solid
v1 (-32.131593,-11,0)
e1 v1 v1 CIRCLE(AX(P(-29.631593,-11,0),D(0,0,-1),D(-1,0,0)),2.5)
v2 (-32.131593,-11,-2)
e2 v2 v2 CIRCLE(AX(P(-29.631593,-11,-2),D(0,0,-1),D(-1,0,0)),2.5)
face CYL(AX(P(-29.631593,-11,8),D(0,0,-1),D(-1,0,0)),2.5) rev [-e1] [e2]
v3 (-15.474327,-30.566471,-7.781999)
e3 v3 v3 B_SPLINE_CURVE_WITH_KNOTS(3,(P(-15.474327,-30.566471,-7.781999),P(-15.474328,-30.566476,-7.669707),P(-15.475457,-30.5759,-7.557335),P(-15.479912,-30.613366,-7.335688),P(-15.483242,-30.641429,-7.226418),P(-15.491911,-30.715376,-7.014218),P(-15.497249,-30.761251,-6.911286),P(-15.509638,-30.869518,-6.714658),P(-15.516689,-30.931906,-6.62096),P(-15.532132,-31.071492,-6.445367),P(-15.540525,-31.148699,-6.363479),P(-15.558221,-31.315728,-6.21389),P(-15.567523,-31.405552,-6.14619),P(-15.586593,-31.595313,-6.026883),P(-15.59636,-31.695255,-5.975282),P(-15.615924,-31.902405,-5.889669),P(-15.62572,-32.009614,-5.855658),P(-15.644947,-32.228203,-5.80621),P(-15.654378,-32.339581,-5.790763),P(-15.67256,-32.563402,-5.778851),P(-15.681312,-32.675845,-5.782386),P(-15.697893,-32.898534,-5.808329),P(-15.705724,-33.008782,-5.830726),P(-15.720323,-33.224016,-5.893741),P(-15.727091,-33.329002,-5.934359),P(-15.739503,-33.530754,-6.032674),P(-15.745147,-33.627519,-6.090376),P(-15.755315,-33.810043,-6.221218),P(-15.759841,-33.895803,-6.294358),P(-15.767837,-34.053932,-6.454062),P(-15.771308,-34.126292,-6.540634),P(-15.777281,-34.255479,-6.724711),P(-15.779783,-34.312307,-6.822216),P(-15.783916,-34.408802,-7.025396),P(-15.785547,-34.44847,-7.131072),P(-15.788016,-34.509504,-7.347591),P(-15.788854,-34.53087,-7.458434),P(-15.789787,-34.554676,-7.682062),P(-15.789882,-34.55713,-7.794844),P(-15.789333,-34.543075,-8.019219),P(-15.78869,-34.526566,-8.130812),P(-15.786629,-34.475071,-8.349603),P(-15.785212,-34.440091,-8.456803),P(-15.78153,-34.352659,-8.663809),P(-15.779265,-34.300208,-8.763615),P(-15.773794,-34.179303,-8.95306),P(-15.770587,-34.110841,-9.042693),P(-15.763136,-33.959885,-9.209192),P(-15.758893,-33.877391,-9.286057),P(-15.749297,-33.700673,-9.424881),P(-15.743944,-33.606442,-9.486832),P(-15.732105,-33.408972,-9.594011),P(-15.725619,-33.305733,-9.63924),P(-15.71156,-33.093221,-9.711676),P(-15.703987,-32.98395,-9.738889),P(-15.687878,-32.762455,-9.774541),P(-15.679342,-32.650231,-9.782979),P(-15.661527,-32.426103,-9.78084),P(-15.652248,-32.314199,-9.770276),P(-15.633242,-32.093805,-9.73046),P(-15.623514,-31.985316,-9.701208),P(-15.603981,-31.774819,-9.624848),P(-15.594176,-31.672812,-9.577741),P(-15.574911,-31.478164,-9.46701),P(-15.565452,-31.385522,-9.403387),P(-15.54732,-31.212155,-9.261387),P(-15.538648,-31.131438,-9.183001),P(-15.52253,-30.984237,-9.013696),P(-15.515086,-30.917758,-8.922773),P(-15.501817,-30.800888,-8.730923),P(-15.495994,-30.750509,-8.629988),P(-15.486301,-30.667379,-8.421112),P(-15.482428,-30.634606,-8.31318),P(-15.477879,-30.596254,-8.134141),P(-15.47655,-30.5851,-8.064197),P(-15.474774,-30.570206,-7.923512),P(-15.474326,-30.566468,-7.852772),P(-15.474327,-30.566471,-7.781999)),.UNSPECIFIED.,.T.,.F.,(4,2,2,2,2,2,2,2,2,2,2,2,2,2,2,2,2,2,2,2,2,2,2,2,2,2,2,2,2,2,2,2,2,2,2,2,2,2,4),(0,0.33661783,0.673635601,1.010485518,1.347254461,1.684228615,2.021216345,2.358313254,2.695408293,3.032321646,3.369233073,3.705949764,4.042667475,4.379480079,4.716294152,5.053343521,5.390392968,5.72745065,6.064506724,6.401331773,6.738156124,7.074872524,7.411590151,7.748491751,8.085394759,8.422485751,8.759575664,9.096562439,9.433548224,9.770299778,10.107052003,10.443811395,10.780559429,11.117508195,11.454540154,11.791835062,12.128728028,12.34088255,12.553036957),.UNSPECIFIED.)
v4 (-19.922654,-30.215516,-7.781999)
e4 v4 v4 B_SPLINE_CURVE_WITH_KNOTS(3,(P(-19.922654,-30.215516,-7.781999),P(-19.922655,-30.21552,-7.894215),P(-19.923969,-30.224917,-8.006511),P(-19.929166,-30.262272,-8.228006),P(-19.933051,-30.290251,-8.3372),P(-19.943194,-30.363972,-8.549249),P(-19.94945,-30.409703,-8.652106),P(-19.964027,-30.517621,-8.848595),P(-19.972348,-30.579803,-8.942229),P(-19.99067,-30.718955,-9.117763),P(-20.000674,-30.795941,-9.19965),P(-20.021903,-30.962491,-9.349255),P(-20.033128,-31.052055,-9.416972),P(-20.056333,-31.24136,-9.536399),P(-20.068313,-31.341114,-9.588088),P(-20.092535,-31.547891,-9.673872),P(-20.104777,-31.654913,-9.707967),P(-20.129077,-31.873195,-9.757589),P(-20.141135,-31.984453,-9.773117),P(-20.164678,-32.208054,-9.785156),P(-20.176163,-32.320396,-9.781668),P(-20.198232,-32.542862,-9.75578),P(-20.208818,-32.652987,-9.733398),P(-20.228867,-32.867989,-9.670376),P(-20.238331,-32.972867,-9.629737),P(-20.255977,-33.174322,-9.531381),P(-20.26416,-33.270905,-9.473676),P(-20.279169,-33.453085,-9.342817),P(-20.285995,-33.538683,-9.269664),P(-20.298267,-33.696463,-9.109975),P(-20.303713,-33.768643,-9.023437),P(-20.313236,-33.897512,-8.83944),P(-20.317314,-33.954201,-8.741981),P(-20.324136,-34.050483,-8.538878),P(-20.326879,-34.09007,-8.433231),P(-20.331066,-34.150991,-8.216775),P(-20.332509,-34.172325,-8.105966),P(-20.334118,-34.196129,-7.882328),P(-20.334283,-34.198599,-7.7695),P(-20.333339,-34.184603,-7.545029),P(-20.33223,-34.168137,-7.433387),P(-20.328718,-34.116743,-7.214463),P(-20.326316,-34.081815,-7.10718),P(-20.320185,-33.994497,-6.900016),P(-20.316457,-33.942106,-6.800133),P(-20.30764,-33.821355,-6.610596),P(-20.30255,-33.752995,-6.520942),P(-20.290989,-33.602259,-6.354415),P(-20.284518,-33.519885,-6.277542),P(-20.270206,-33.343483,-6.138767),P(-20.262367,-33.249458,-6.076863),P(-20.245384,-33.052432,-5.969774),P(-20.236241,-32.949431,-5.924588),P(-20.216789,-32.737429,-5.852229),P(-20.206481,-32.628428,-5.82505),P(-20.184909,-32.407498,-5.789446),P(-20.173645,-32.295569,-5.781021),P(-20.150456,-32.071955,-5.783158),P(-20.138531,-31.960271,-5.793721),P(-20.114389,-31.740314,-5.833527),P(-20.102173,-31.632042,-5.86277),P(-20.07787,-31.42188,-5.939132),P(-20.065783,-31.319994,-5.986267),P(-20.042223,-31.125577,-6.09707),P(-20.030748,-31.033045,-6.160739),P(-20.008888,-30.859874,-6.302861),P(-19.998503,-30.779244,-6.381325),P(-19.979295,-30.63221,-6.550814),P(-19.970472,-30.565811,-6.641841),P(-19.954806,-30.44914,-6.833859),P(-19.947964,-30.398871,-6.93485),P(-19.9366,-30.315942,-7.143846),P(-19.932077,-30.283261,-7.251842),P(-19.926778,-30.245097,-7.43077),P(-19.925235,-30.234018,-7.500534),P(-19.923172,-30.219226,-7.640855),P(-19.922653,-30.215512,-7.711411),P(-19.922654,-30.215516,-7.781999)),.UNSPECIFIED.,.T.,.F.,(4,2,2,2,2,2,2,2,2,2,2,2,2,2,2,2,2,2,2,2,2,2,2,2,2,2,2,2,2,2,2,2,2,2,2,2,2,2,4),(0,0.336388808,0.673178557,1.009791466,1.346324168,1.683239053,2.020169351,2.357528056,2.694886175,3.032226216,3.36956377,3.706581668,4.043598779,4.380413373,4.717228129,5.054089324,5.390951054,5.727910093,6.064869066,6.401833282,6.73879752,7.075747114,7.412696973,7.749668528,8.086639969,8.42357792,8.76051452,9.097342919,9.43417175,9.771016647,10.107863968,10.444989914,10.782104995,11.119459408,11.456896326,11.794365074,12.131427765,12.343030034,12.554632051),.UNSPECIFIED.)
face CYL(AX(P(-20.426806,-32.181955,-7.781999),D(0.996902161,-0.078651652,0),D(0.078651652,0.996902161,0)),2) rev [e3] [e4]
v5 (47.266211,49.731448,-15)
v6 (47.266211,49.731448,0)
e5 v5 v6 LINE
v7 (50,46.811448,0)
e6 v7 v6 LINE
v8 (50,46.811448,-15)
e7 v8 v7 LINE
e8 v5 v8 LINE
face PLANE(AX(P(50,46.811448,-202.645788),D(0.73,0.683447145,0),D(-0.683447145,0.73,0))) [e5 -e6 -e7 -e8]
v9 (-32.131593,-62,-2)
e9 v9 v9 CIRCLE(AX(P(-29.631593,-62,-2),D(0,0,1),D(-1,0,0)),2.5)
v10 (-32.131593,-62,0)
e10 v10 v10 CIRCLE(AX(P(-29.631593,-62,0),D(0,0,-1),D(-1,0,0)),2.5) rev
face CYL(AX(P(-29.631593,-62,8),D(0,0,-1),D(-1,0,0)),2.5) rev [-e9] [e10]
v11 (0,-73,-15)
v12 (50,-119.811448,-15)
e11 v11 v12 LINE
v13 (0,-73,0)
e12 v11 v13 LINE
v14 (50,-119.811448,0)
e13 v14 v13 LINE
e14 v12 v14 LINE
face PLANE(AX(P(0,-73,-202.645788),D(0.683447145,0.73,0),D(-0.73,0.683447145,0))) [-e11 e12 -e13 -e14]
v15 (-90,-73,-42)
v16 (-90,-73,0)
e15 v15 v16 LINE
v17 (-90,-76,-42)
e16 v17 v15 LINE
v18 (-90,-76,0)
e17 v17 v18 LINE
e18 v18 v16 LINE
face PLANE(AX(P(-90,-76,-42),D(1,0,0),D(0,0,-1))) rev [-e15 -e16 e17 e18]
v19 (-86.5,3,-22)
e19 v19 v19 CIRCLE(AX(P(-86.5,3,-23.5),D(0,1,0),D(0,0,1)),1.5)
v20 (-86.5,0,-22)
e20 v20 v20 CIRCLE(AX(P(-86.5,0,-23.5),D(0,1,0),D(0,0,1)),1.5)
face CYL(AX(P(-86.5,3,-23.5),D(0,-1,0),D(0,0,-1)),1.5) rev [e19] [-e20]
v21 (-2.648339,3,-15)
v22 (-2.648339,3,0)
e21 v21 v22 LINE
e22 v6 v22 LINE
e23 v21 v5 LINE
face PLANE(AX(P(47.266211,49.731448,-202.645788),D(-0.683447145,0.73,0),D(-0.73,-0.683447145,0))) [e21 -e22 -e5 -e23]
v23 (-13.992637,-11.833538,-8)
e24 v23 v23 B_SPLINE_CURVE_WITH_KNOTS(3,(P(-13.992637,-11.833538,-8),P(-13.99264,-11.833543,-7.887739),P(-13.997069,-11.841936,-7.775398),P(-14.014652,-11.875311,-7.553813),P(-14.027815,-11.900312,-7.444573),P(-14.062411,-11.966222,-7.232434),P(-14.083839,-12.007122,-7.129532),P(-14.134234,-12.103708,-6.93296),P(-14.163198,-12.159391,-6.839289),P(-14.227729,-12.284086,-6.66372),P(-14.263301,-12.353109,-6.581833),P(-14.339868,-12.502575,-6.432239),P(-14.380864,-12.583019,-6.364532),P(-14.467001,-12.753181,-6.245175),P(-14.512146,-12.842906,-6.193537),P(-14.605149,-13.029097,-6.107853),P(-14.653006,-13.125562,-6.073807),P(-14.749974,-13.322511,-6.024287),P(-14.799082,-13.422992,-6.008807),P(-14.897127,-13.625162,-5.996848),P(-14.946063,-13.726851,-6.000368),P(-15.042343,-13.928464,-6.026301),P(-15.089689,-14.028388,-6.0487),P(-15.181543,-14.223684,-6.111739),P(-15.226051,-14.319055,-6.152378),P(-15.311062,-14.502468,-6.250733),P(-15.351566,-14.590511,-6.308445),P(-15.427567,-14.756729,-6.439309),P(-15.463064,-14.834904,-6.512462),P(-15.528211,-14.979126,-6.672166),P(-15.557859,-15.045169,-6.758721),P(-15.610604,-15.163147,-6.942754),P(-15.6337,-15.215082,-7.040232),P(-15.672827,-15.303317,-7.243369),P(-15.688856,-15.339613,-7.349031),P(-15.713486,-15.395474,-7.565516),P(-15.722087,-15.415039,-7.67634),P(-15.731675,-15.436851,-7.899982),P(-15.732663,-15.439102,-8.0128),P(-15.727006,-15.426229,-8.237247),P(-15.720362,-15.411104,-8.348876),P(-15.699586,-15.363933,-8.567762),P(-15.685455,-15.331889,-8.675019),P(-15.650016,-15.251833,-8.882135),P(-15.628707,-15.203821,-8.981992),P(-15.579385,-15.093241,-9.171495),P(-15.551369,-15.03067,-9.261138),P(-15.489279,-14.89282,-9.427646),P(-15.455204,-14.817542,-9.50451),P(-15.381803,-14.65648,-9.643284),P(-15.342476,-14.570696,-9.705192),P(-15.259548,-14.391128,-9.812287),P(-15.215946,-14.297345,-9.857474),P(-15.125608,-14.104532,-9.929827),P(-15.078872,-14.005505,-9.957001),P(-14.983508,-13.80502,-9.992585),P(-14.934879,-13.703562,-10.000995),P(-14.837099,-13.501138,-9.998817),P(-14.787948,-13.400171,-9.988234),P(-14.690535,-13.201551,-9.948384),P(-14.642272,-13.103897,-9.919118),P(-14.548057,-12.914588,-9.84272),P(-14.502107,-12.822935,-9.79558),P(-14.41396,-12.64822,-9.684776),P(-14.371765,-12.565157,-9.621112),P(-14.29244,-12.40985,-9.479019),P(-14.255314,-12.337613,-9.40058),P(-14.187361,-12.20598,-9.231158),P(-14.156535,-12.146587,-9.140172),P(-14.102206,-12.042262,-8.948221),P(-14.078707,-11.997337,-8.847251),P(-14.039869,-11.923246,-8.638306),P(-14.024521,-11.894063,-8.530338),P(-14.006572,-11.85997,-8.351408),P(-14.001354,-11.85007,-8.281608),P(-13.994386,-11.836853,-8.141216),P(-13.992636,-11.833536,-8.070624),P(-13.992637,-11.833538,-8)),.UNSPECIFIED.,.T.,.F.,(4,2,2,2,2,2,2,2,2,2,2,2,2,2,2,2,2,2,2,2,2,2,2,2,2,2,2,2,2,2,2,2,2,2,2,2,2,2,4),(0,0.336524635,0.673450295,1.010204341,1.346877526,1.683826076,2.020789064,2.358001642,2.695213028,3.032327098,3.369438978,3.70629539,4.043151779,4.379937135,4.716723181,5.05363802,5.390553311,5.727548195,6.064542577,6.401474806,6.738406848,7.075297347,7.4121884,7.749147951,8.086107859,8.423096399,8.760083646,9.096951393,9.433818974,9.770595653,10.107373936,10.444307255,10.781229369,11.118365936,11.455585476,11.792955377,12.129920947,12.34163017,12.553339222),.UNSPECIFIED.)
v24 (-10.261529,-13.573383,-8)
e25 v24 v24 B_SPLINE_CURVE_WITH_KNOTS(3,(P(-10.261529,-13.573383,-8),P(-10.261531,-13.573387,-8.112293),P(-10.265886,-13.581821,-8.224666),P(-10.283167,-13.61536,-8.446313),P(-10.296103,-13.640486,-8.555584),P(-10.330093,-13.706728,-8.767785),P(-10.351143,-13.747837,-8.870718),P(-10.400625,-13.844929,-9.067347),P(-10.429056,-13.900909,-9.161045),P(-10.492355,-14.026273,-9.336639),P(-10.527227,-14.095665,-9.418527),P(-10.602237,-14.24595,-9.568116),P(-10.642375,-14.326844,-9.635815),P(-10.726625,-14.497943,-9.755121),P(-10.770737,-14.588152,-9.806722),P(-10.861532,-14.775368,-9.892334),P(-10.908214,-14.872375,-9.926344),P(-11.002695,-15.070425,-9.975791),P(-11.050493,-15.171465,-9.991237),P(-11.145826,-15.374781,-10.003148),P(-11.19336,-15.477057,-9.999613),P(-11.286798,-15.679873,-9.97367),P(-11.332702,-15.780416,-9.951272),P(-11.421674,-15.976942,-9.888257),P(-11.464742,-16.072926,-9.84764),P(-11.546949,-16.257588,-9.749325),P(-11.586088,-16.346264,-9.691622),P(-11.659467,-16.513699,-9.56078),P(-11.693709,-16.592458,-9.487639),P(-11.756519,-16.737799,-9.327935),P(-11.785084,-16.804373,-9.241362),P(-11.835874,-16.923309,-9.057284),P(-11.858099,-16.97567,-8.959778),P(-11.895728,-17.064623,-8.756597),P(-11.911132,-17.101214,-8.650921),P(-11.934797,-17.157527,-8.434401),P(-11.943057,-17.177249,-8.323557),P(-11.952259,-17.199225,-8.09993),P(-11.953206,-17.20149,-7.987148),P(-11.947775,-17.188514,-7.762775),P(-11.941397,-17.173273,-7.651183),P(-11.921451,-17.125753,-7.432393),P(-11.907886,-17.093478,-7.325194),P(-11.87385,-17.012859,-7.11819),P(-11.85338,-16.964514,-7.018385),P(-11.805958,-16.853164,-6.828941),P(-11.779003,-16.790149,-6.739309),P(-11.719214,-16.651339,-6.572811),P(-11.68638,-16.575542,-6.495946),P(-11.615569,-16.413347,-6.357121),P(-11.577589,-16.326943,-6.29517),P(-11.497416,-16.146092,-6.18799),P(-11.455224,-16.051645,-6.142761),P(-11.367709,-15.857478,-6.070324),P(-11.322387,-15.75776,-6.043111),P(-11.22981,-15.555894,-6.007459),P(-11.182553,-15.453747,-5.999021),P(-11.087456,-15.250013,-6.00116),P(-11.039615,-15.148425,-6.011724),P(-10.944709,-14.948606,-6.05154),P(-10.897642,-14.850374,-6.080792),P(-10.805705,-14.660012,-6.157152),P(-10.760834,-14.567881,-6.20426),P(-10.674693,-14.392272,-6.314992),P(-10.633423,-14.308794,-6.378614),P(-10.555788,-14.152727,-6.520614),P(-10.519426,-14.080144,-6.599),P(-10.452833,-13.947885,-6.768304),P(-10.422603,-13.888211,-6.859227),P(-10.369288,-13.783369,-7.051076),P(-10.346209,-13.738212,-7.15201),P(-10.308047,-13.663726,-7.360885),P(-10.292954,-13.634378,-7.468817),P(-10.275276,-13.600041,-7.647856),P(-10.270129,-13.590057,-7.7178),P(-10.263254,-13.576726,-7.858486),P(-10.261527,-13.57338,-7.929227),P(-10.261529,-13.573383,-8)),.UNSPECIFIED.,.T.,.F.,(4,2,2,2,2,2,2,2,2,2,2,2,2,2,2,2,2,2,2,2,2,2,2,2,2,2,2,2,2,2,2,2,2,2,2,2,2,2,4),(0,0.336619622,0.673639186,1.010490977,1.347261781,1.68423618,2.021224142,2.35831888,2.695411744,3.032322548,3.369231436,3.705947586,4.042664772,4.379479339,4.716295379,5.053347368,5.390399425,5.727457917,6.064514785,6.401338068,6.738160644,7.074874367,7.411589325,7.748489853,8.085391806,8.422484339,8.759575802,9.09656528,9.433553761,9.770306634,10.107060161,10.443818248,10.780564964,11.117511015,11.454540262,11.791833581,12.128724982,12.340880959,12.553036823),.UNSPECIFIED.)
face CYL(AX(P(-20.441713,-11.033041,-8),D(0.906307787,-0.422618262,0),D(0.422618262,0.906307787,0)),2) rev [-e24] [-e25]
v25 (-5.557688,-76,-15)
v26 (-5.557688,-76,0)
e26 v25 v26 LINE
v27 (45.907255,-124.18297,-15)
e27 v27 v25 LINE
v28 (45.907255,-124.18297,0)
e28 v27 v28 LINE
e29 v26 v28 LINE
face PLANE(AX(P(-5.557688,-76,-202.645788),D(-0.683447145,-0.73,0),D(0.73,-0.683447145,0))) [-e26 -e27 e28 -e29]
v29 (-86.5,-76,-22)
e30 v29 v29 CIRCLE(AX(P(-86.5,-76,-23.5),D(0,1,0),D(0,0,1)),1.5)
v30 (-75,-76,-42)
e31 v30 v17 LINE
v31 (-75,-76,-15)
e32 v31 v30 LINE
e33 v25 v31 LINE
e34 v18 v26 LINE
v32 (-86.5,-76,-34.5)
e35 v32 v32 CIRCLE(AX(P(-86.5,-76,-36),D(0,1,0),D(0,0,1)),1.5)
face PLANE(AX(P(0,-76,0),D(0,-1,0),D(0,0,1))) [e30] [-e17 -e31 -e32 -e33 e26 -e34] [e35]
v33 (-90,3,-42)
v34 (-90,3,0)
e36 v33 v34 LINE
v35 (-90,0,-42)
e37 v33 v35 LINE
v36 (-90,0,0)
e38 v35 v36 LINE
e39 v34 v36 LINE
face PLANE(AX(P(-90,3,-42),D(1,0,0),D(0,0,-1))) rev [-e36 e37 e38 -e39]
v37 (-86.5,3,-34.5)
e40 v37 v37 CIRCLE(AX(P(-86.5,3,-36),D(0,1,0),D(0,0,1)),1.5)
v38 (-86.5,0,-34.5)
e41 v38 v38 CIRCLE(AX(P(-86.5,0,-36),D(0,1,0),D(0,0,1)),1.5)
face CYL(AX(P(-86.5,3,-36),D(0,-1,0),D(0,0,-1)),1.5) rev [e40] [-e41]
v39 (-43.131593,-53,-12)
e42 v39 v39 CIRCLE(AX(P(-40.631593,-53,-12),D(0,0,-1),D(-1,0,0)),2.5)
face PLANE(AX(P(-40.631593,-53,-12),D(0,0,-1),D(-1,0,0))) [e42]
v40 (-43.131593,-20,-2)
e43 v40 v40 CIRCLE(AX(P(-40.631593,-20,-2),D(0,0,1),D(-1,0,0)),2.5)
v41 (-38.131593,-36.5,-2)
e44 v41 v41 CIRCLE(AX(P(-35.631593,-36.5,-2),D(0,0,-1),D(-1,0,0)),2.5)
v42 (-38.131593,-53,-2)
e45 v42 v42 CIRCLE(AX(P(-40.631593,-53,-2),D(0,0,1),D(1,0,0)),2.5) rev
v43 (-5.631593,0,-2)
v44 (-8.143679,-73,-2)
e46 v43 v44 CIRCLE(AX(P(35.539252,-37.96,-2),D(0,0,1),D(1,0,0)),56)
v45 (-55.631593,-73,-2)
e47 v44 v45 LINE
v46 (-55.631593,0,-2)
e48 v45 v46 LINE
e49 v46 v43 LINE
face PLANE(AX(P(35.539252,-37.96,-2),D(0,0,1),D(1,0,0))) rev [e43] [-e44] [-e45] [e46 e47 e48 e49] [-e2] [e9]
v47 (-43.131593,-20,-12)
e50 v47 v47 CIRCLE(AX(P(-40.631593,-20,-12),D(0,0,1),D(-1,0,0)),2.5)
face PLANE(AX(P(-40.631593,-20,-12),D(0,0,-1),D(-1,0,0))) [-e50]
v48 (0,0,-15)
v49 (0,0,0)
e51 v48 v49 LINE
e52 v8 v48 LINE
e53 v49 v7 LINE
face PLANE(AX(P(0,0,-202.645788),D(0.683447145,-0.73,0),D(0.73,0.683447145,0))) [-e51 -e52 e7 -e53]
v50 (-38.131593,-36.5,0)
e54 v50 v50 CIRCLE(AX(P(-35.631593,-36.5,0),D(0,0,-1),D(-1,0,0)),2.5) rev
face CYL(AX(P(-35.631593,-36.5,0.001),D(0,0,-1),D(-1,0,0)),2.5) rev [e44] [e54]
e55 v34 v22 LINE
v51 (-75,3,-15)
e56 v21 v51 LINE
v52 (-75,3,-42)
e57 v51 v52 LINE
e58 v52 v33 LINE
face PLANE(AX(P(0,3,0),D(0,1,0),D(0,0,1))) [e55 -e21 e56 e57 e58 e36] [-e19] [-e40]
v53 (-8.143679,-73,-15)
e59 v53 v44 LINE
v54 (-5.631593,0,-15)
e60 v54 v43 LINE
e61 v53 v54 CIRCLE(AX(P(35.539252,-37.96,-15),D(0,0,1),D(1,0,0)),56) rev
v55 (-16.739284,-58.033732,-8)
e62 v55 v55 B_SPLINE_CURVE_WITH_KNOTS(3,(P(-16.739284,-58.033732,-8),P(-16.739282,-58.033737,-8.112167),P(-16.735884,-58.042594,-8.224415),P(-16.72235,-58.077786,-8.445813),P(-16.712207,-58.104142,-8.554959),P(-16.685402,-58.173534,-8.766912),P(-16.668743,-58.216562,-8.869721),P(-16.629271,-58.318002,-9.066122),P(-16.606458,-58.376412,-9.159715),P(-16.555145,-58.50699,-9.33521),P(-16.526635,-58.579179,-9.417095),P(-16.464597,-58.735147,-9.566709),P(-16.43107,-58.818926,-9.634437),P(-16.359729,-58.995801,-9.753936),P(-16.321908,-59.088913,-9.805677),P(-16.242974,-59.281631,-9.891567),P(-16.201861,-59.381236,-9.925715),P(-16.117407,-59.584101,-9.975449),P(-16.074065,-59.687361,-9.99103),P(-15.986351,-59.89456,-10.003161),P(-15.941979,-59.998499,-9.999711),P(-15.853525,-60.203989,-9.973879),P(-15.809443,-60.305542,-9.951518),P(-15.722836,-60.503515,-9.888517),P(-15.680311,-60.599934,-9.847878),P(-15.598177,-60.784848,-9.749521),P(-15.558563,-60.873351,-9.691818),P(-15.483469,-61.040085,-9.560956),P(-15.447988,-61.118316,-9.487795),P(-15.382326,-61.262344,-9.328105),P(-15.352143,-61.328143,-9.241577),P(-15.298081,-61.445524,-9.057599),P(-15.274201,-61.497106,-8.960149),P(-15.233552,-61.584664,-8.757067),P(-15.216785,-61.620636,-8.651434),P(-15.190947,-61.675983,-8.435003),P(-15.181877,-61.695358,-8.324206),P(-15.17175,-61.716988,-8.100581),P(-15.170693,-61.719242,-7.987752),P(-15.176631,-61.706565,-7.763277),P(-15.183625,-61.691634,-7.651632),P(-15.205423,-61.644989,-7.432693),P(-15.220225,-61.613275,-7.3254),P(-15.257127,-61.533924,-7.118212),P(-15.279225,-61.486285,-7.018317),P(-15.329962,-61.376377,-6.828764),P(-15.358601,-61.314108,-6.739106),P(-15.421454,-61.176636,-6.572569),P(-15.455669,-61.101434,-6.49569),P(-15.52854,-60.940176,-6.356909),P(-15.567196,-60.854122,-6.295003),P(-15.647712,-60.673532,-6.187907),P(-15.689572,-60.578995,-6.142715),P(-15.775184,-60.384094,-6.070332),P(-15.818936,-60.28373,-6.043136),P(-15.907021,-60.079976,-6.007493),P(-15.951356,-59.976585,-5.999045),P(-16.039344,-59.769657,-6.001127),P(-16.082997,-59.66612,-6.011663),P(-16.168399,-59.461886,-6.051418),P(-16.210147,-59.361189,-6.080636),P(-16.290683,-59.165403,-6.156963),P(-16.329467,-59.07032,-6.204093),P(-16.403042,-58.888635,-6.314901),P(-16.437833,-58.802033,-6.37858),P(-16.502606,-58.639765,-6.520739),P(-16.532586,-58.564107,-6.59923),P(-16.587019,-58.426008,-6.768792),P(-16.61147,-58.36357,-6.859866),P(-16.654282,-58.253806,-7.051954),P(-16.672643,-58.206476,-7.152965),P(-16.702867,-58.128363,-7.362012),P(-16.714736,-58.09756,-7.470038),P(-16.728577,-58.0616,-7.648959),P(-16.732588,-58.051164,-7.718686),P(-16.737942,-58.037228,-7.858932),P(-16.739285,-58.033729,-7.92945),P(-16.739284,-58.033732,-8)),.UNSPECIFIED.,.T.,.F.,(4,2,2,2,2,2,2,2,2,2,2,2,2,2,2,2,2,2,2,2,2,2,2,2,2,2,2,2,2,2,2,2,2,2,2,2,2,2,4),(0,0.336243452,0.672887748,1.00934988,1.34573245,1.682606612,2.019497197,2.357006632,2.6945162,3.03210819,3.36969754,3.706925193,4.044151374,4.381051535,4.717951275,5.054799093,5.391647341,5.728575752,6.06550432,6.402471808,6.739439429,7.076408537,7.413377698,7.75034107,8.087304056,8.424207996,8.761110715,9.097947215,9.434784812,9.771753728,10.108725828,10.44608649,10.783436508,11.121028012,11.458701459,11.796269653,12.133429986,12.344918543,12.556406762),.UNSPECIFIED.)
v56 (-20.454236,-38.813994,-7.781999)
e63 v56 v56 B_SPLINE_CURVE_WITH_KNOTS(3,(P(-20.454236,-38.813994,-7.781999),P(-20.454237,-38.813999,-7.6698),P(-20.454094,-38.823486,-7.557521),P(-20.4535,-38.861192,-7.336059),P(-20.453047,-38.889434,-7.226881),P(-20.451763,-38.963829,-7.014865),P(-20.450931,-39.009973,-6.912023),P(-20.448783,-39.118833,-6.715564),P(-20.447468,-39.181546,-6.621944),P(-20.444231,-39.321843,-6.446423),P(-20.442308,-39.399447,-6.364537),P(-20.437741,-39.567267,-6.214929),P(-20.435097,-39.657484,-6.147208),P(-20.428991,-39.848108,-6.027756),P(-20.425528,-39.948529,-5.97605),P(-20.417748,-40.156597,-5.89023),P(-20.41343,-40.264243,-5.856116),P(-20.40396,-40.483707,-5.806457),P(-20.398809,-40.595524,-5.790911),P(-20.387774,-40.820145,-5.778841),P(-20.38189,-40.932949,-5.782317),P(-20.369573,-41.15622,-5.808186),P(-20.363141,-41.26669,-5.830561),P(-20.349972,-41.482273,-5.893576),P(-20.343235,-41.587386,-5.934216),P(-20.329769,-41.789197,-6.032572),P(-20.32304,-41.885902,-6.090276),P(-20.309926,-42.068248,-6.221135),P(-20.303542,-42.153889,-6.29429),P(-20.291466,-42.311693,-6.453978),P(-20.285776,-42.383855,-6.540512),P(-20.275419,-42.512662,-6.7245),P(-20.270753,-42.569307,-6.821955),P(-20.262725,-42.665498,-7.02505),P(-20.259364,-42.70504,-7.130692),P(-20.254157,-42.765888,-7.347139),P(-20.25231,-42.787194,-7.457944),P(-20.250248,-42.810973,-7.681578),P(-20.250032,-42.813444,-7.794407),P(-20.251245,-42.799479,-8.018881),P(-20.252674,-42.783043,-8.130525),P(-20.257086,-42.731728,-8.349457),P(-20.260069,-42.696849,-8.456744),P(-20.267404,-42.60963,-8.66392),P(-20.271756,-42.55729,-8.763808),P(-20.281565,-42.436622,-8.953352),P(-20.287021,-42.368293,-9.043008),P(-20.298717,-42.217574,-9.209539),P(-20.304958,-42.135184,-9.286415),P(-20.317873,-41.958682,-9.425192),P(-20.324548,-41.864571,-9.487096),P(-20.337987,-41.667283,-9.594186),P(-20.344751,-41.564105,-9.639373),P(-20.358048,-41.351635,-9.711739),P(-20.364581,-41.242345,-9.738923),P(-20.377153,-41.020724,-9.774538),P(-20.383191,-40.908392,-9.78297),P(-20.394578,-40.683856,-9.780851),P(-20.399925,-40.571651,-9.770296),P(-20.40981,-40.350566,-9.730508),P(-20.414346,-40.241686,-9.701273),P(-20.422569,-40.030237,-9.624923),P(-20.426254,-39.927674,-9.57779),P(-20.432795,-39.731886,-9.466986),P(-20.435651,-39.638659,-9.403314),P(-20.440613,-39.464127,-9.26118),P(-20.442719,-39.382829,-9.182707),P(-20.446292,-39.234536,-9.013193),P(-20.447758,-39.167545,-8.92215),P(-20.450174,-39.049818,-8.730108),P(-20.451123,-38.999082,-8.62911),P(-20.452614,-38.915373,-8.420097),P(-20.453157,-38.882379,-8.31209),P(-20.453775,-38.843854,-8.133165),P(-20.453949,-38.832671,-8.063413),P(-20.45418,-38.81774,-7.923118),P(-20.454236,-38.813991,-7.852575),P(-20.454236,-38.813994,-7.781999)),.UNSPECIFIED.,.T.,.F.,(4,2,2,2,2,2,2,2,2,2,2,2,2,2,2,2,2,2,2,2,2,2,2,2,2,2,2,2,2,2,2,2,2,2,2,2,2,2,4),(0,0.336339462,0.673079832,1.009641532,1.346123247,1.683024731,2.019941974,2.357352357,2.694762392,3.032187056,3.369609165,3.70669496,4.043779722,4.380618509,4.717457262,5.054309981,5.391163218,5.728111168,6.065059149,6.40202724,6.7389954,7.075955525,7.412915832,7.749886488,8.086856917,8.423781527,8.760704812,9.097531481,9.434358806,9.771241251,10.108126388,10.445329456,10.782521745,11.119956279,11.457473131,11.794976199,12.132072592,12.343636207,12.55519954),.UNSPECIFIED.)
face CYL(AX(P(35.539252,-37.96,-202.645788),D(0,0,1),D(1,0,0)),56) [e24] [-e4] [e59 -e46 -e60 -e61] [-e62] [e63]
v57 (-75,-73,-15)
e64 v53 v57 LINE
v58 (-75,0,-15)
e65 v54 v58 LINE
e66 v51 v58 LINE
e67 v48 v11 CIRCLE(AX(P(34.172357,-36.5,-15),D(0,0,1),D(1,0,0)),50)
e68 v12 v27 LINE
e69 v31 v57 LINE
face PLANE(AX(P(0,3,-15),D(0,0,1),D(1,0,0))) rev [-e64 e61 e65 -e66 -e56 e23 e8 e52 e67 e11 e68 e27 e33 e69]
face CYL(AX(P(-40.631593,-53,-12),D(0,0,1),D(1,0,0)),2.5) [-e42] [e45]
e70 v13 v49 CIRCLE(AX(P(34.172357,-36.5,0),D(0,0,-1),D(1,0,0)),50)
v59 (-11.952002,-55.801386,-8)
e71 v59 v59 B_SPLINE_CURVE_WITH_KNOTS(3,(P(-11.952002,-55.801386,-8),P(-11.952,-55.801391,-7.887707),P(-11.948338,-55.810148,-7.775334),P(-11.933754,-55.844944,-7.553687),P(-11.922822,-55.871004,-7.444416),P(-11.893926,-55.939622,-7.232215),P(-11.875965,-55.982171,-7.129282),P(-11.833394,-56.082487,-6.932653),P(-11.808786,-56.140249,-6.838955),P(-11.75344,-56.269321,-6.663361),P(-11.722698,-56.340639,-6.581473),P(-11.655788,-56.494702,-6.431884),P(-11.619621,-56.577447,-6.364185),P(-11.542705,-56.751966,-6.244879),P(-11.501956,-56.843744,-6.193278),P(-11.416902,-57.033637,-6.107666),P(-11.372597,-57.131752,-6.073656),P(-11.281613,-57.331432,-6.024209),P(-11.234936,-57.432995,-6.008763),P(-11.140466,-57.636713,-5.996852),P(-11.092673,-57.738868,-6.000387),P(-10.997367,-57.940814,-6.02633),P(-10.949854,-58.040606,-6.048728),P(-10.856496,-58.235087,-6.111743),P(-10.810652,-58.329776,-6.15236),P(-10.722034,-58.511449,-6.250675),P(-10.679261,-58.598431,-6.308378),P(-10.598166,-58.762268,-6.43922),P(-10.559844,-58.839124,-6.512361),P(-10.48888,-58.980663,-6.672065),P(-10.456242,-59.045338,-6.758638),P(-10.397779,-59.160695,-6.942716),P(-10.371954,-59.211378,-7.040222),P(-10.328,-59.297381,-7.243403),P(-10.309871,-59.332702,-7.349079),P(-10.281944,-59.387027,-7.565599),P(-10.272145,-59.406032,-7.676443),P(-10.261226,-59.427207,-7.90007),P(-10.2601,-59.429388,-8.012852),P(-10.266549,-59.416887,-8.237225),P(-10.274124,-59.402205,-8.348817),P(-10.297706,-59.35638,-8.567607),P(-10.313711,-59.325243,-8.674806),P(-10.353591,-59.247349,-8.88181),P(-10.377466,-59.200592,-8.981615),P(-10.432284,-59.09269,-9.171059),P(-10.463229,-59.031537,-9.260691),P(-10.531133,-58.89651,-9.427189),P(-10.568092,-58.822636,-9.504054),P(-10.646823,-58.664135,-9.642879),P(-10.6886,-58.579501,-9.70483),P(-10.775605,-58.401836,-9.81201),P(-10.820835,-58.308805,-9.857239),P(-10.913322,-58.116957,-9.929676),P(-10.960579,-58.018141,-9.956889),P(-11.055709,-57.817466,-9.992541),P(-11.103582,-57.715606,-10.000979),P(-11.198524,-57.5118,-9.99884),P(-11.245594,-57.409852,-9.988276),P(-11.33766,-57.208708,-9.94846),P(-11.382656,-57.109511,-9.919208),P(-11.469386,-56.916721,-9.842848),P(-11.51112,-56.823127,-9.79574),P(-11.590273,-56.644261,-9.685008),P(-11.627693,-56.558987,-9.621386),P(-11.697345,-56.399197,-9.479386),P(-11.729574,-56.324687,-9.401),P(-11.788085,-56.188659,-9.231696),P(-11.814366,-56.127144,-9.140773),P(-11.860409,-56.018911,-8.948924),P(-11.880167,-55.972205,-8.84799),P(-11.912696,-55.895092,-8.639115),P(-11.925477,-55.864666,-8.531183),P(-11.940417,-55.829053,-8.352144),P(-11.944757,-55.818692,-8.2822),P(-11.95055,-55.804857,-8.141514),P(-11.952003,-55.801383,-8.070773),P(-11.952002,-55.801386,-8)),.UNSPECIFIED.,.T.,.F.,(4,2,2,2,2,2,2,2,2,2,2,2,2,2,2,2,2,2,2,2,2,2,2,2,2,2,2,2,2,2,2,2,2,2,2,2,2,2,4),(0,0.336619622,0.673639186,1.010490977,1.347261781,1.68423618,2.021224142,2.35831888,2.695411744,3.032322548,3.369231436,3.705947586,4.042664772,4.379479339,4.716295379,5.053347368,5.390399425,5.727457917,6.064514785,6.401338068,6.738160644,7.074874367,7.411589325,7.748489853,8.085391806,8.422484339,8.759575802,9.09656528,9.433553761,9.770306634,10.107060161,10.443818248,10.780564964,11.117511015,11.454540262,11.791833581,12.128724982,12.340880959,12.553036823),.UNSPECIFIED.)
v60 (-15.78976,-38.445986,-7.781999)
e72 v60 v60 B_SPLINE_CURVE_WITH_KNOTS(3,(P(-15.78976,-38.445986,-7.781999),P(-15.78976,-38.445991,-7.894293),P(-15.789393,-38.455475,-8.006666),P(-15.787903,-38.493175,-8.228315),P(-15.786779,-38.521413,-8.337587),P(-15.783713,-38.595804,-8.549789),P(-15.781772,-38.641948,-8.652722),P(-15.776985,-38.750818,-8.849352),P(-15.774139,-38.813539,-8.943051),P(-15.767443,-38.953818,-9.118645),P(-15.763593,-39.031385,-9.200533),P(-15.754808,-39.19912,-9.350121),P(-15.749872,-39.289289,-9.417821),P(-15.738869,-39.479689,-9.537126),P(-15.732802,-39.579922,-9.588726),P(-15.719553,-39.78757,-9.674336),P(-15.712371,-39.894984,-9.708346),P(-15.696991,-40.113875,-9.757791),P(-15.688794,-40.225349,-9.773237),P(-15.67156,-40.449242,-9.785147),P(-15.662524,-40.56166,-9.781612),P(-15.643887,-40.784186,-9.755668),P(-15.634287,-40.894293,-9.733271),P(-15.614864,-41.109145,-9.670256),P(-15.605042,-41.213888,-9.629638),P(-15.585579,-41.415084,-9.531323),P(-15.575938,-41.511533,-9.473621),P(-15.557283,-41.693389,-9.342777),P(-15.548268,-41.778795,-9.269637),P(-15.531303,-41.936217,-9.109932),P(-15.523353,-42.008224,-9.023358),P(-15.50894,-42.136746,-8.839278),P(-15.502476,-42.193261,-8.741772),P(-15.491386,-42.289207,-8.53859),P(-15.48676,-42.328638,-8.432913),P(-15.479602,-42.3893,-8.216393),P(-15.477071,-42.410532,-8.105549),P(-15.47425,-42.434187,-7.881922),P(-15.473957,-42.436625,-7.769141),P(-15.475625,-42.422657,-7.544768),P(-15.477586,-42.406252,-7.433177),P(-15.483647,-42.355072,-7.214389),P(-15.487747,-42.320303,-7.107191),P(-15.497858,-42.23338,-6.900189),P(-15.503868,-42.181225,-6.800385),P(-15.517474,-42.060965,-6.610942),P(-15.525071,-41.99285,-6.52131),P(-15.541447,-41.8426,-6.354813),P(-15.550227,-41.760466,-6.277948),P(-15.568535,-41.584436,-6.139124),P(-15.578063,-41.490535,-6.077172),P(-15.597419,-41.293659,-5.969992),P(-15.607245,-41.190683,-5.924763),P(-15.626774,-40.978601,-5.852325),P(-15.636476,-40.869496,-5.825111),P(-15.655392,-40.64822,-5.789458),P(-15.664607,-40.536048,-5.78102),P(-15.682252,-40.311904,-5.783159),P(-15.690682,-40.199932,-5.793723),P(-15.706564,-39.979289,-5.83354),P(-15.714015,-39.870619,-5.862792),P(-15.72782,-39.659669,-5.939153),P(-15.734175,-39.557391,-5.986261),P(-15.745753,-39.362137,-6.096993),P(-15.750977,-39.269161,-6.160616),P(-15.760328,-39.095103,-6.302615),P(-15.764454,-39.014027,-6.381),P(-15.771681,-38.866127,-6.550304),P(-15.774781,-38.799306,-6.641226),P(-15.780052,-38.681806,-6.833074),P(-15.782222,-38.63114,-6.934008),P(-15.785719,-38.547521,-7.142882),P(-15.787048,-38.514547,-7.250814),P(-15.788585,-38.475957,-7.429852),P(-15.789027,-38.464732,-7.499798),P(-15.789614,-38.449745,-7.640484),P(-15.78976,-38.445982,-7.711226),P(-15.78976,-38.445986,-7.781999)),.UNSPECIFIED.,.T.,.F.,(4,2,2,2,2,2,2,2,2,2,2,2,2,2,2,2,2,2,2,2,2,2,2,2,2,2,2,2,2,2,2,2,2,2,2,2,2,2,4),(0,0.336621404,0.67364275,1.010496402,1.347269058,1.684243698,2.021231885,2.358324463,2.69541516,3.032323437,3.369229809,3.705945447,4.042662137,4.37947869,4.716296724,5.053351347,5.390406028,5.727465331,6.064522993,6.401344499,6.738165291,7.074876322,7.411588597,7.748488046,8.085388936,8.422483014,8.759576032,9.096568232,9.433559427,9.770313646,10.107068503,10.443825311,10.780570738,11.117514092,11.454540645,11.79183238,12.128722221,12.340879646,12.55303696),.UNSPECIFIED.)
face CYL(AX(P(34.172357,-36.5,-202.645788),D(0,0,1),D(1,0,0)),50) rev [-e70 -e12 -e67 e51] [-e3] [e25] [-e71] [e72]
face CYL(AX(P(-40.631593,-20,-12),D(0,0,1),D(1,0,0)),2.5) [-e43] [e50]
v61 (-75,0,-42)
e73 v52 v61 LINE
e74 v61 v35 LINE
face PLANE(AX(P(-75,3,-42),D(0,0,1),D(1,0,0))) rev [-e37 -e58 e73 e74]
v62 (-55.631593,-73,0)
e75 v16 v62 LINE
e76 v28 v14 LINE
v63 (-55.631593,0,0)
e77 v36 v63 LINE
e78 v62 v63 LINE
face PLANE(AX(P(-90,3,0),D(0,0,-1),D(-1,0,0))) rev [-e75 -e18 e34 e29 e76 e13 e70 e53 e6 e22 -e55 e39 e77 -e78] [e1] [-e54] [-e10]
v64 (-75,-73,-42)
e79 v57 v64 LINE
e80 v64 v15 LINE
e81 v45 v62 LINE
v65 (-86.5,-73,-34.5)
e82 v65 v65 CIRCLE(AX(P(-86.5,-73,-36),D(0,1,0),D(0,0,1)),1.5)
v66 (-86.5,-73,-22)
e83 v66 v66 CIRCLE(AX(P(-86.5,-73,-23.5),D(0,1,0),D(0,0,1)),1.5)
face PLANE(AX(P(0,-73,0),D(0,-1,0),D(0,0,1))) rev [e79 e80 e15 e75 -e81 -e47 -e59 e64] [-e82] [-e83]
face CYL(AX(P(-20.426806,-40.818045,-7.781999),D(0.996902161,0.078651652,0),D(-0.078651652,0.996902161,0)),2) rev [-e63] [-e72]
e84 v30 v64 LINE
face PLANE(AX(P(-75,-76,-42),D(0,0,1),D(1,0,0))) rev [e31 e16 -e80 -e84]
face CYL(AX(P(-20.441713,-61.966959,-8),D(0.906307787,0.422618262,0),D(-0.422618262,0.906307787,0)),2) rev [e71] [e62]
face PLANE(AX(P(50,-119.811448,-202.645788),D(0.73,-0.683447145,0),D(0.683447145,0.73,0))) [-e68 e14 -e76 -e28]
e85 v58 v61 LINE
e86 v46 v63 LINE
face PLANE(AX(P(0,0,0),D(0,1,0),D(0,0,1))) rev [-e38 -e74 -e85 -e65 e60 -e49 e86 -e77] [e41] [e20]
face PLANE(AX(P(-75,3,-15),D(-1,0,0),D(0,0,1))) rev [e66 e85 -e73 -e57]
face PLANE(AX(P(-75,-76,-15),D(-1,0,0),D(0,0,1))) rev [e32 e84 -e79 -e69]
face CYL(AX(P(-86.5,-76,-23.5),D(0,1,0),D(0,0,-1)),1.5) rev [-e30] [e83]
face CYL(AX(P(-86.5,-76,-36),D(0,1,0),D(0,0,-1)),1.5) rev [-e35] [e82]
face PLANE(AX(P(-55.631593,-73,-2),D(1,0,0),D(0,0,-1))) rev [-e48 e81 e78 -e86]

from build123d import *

# Parameters (mm, degrees)
SKETCH1_R            = 1.5
BOSS_EXTRUDE1_DEPTH  = 3
BOSS_EXTRUDE2_DEPTH  = 15
BOSS_EXTRUDE4_DEPTH  = 2
CUT_SWEEP1_START     = -39.833089264
CUT_SWEEP1_OUTLINE_R = 2
CUT_SWEEP1_DEPTH     = 5.418212301
SKETCH13_R           = 2
CUT_EXTRUDE1_REACH   = 160.497
SKETCH14_R           = 2.5
SKETCH15_R           = 2.5
BOSS_EXTRUDE5_DEPTH  = 10
SKETCH16_R           = 2.5
CUT_EXTRUDE2_DEPTH   = 10


# Read off the part's stored shape, not the designer's step: Cut-Sweep1
with BuildPart() as part:
    # Sketch1 → Boss-Extrude1 (new body)
    with BuildSketch(Plane(origin=(0, 0, 0), x_dir=(1, 0, 0), z_dir=(0, 1, 0))):
        Polygon((-90, 42), (-90, 0), (0, 0), (0, 15), (-75, 15), (-75, 42), align=None)
        with Locations(Location((-86.5, 36, 0), (0, 0, 270))):
            Circle(SKETCH1_R, mode=Mode.SUBTRACT)
        with Locations(Location((-86.5, 23.5, 0), (0, 0, 270))):
            Circle(SKETCH1_R, mode=Mode.SUBTRACT)
    extrude(amount=BOSS_EXTRUDE1_DEPTH)


with BuildPart() as body_2:
    # Mirror7: mirrored copy
    add(part.part.mirror(Plane.ZX.offset(-36.5)))


with BuildPart() as part_1:
    add(part.part)

    add(body_2.part)  # Boss-Extrude2 merges body 2
    # Sketch3 → Boss-Extrude2 (add)
    with BuildSketch(Plane.XY):
        with BuildLine():
            Line((0, 0), (50, 46.811448287))
            Line((50, 46.811448287), (47.26621142, 49.731448287))
            Line((47.26621142, 49.731448287), (-2.73378858, 2.92))
            ThreePointArc((-2.73378858, 2.92), (-20.424933424, -35.957501235), (-5.557687519, -76))
            Line((-5.557687519, -76), (45.907254912, -124.182969825))
            Line((45.907254912, -124.182969825), (50, -119.811448287))
            Line((50, -119.811448287), (0, -73))
            ThreePointArc((0, -73), (-15.82764275, -36.5), (0, 0))
        make_face()
    extrude(amount=-BOSS_EXTRUDE2_DEPTH)

    # Sketch4 → Boss-Extrude4 (add)
    with BuildSketch(Plane.XY):
        with BuildLine():
            Line((-8.143678765, -73), (-55.631592513, -73))
            Line((-55.631592513, -73), (-55.631592513, 0))
            Line((-55.631592513, 0), (-5.631592513, 0))
            ThreePointArc((-5.631592513, 0), (-20.427620409, -36.034060143), (-8.143678765, -73))
        make_face()
    extrude(amount=-BOSS_EXTRUDE4_DEPTH)

    # Cut-Sweep1 outline → Cut-Sweep1 (cut)
    with BuildSketch(Plane(origin=(0, 0, 0), x_dir=(-0.4226182617406999, 0.9063077870366498, 0), z_dir=(0.9063077870366498, 0.4226182617406999, 0)).offset(CUT_SWEEP1_START)):
        with Locations((-47.522096447, -8)):
            Circle(CUT_SWEEP1_OUTLINE_R)
    cut_sweep1 = extrude(amount=CUT_SWEEP1_DEPTH, mode=Mode.SUBTRACT)

    # Cut-Sweep2: sweep along a path in Sketch12
    with BuildLine(Plane(origin=(0, 0, -8), x_dir=(-1, 0, 0), z_dir=(0, 0, -1))) as cut_sweep2_path:
        Line((-34.17235725, -36.5), (20.427620409, -40.807723062))
    # Sketch13 → Cut-Sweep2 (sweep, cut)
    with BuildSketch(Plane(origin=(34.17235725, -36.5, -8), x_dir=(0, 0, 1), z_dir=(-0.9969021605356864, -0.07865165172633562, 0))):
        with Locations((0.218000658, -0.010354147)):
            Circle(SKETCH13_R)
    cut_sweep2 = sweep(path=cut_sweep2_path.line, mode=Mode.SUBTRACT)

    # Mirror8: Cut-Sweep1, Cut-Sweep2 across plane
    add(cut_sweep1.mirror(Plane.ZX.offset(-36.5)), mode=Mode.SUBTRACT)
    add(cut_sweep2.mirror(Plane.ZX.offset(-36.5)), mode=Mode.SUBTRACT)

    # Sketch14 → Cut-Extrude1 (cut, up to next)
    with BuildSketch(Plane(origin=(0, 0, -2), x_dir=(-1, 0, 0), z_dir=(0, 0, -1)), mode=Mode.PRIVATE) as cut_extrude1_sk1:
        with Locations((35.631592513, -36.5)):
            Circle(SKETCH14_R)
    cut_extrude1_tool1 = extrude(cut_extrude1_sk1.sketch, amount=-CUT_EXTRUDE1_REACH, mode=Mode.PRIVATE) & part_1.part
    add(cut_extrude1_tool1.solids().sort_by_distance((-35.631593, -36.5, -2))[0], mode=Mode.SUBTRACT)

    # Sketch15 → Boss-Extrude5 (add)
    with BuildSketch(Plane(origin=(0, 0, -2), x_dir=(-1, 0, 0), z_dir=(0, 0, -1))):
        with Locations(Location((40.631592513, -53, 0), (0, 0, 180))):
            Circle(SKETCH15_R)
    boss_extrude5 = extrude(amount=BOSS_EXTRUDE5_DEPTH)

    # Mirror9: Boss-Extrude5 across plane
    add(boss_extrude5.mirror(Plane.ZX.offset(-36.5)))

    # Sketch16 → Cut-Extrude2 (cut)
    with BuildSketch(Plane(origin=(0, 0, -2), x_dir=(-1, 0, 0), z_dir=(0, 0, -1))):
        with Locations((29.631592513, -11)):
            Circle(SKETCH16_R)
    cut_extrude2 = extrude(amount=-CUT_EXTRUDE2_DEPTH, mode=Mode.SUBTRACT)

    # Mirror10: Cut-Extrude2 across plane
    add(cut_extrude2.mirror(Plane.ZX.offset(-36.5)), mode=Mode.SUBTRACT)


solid = part_1.part
